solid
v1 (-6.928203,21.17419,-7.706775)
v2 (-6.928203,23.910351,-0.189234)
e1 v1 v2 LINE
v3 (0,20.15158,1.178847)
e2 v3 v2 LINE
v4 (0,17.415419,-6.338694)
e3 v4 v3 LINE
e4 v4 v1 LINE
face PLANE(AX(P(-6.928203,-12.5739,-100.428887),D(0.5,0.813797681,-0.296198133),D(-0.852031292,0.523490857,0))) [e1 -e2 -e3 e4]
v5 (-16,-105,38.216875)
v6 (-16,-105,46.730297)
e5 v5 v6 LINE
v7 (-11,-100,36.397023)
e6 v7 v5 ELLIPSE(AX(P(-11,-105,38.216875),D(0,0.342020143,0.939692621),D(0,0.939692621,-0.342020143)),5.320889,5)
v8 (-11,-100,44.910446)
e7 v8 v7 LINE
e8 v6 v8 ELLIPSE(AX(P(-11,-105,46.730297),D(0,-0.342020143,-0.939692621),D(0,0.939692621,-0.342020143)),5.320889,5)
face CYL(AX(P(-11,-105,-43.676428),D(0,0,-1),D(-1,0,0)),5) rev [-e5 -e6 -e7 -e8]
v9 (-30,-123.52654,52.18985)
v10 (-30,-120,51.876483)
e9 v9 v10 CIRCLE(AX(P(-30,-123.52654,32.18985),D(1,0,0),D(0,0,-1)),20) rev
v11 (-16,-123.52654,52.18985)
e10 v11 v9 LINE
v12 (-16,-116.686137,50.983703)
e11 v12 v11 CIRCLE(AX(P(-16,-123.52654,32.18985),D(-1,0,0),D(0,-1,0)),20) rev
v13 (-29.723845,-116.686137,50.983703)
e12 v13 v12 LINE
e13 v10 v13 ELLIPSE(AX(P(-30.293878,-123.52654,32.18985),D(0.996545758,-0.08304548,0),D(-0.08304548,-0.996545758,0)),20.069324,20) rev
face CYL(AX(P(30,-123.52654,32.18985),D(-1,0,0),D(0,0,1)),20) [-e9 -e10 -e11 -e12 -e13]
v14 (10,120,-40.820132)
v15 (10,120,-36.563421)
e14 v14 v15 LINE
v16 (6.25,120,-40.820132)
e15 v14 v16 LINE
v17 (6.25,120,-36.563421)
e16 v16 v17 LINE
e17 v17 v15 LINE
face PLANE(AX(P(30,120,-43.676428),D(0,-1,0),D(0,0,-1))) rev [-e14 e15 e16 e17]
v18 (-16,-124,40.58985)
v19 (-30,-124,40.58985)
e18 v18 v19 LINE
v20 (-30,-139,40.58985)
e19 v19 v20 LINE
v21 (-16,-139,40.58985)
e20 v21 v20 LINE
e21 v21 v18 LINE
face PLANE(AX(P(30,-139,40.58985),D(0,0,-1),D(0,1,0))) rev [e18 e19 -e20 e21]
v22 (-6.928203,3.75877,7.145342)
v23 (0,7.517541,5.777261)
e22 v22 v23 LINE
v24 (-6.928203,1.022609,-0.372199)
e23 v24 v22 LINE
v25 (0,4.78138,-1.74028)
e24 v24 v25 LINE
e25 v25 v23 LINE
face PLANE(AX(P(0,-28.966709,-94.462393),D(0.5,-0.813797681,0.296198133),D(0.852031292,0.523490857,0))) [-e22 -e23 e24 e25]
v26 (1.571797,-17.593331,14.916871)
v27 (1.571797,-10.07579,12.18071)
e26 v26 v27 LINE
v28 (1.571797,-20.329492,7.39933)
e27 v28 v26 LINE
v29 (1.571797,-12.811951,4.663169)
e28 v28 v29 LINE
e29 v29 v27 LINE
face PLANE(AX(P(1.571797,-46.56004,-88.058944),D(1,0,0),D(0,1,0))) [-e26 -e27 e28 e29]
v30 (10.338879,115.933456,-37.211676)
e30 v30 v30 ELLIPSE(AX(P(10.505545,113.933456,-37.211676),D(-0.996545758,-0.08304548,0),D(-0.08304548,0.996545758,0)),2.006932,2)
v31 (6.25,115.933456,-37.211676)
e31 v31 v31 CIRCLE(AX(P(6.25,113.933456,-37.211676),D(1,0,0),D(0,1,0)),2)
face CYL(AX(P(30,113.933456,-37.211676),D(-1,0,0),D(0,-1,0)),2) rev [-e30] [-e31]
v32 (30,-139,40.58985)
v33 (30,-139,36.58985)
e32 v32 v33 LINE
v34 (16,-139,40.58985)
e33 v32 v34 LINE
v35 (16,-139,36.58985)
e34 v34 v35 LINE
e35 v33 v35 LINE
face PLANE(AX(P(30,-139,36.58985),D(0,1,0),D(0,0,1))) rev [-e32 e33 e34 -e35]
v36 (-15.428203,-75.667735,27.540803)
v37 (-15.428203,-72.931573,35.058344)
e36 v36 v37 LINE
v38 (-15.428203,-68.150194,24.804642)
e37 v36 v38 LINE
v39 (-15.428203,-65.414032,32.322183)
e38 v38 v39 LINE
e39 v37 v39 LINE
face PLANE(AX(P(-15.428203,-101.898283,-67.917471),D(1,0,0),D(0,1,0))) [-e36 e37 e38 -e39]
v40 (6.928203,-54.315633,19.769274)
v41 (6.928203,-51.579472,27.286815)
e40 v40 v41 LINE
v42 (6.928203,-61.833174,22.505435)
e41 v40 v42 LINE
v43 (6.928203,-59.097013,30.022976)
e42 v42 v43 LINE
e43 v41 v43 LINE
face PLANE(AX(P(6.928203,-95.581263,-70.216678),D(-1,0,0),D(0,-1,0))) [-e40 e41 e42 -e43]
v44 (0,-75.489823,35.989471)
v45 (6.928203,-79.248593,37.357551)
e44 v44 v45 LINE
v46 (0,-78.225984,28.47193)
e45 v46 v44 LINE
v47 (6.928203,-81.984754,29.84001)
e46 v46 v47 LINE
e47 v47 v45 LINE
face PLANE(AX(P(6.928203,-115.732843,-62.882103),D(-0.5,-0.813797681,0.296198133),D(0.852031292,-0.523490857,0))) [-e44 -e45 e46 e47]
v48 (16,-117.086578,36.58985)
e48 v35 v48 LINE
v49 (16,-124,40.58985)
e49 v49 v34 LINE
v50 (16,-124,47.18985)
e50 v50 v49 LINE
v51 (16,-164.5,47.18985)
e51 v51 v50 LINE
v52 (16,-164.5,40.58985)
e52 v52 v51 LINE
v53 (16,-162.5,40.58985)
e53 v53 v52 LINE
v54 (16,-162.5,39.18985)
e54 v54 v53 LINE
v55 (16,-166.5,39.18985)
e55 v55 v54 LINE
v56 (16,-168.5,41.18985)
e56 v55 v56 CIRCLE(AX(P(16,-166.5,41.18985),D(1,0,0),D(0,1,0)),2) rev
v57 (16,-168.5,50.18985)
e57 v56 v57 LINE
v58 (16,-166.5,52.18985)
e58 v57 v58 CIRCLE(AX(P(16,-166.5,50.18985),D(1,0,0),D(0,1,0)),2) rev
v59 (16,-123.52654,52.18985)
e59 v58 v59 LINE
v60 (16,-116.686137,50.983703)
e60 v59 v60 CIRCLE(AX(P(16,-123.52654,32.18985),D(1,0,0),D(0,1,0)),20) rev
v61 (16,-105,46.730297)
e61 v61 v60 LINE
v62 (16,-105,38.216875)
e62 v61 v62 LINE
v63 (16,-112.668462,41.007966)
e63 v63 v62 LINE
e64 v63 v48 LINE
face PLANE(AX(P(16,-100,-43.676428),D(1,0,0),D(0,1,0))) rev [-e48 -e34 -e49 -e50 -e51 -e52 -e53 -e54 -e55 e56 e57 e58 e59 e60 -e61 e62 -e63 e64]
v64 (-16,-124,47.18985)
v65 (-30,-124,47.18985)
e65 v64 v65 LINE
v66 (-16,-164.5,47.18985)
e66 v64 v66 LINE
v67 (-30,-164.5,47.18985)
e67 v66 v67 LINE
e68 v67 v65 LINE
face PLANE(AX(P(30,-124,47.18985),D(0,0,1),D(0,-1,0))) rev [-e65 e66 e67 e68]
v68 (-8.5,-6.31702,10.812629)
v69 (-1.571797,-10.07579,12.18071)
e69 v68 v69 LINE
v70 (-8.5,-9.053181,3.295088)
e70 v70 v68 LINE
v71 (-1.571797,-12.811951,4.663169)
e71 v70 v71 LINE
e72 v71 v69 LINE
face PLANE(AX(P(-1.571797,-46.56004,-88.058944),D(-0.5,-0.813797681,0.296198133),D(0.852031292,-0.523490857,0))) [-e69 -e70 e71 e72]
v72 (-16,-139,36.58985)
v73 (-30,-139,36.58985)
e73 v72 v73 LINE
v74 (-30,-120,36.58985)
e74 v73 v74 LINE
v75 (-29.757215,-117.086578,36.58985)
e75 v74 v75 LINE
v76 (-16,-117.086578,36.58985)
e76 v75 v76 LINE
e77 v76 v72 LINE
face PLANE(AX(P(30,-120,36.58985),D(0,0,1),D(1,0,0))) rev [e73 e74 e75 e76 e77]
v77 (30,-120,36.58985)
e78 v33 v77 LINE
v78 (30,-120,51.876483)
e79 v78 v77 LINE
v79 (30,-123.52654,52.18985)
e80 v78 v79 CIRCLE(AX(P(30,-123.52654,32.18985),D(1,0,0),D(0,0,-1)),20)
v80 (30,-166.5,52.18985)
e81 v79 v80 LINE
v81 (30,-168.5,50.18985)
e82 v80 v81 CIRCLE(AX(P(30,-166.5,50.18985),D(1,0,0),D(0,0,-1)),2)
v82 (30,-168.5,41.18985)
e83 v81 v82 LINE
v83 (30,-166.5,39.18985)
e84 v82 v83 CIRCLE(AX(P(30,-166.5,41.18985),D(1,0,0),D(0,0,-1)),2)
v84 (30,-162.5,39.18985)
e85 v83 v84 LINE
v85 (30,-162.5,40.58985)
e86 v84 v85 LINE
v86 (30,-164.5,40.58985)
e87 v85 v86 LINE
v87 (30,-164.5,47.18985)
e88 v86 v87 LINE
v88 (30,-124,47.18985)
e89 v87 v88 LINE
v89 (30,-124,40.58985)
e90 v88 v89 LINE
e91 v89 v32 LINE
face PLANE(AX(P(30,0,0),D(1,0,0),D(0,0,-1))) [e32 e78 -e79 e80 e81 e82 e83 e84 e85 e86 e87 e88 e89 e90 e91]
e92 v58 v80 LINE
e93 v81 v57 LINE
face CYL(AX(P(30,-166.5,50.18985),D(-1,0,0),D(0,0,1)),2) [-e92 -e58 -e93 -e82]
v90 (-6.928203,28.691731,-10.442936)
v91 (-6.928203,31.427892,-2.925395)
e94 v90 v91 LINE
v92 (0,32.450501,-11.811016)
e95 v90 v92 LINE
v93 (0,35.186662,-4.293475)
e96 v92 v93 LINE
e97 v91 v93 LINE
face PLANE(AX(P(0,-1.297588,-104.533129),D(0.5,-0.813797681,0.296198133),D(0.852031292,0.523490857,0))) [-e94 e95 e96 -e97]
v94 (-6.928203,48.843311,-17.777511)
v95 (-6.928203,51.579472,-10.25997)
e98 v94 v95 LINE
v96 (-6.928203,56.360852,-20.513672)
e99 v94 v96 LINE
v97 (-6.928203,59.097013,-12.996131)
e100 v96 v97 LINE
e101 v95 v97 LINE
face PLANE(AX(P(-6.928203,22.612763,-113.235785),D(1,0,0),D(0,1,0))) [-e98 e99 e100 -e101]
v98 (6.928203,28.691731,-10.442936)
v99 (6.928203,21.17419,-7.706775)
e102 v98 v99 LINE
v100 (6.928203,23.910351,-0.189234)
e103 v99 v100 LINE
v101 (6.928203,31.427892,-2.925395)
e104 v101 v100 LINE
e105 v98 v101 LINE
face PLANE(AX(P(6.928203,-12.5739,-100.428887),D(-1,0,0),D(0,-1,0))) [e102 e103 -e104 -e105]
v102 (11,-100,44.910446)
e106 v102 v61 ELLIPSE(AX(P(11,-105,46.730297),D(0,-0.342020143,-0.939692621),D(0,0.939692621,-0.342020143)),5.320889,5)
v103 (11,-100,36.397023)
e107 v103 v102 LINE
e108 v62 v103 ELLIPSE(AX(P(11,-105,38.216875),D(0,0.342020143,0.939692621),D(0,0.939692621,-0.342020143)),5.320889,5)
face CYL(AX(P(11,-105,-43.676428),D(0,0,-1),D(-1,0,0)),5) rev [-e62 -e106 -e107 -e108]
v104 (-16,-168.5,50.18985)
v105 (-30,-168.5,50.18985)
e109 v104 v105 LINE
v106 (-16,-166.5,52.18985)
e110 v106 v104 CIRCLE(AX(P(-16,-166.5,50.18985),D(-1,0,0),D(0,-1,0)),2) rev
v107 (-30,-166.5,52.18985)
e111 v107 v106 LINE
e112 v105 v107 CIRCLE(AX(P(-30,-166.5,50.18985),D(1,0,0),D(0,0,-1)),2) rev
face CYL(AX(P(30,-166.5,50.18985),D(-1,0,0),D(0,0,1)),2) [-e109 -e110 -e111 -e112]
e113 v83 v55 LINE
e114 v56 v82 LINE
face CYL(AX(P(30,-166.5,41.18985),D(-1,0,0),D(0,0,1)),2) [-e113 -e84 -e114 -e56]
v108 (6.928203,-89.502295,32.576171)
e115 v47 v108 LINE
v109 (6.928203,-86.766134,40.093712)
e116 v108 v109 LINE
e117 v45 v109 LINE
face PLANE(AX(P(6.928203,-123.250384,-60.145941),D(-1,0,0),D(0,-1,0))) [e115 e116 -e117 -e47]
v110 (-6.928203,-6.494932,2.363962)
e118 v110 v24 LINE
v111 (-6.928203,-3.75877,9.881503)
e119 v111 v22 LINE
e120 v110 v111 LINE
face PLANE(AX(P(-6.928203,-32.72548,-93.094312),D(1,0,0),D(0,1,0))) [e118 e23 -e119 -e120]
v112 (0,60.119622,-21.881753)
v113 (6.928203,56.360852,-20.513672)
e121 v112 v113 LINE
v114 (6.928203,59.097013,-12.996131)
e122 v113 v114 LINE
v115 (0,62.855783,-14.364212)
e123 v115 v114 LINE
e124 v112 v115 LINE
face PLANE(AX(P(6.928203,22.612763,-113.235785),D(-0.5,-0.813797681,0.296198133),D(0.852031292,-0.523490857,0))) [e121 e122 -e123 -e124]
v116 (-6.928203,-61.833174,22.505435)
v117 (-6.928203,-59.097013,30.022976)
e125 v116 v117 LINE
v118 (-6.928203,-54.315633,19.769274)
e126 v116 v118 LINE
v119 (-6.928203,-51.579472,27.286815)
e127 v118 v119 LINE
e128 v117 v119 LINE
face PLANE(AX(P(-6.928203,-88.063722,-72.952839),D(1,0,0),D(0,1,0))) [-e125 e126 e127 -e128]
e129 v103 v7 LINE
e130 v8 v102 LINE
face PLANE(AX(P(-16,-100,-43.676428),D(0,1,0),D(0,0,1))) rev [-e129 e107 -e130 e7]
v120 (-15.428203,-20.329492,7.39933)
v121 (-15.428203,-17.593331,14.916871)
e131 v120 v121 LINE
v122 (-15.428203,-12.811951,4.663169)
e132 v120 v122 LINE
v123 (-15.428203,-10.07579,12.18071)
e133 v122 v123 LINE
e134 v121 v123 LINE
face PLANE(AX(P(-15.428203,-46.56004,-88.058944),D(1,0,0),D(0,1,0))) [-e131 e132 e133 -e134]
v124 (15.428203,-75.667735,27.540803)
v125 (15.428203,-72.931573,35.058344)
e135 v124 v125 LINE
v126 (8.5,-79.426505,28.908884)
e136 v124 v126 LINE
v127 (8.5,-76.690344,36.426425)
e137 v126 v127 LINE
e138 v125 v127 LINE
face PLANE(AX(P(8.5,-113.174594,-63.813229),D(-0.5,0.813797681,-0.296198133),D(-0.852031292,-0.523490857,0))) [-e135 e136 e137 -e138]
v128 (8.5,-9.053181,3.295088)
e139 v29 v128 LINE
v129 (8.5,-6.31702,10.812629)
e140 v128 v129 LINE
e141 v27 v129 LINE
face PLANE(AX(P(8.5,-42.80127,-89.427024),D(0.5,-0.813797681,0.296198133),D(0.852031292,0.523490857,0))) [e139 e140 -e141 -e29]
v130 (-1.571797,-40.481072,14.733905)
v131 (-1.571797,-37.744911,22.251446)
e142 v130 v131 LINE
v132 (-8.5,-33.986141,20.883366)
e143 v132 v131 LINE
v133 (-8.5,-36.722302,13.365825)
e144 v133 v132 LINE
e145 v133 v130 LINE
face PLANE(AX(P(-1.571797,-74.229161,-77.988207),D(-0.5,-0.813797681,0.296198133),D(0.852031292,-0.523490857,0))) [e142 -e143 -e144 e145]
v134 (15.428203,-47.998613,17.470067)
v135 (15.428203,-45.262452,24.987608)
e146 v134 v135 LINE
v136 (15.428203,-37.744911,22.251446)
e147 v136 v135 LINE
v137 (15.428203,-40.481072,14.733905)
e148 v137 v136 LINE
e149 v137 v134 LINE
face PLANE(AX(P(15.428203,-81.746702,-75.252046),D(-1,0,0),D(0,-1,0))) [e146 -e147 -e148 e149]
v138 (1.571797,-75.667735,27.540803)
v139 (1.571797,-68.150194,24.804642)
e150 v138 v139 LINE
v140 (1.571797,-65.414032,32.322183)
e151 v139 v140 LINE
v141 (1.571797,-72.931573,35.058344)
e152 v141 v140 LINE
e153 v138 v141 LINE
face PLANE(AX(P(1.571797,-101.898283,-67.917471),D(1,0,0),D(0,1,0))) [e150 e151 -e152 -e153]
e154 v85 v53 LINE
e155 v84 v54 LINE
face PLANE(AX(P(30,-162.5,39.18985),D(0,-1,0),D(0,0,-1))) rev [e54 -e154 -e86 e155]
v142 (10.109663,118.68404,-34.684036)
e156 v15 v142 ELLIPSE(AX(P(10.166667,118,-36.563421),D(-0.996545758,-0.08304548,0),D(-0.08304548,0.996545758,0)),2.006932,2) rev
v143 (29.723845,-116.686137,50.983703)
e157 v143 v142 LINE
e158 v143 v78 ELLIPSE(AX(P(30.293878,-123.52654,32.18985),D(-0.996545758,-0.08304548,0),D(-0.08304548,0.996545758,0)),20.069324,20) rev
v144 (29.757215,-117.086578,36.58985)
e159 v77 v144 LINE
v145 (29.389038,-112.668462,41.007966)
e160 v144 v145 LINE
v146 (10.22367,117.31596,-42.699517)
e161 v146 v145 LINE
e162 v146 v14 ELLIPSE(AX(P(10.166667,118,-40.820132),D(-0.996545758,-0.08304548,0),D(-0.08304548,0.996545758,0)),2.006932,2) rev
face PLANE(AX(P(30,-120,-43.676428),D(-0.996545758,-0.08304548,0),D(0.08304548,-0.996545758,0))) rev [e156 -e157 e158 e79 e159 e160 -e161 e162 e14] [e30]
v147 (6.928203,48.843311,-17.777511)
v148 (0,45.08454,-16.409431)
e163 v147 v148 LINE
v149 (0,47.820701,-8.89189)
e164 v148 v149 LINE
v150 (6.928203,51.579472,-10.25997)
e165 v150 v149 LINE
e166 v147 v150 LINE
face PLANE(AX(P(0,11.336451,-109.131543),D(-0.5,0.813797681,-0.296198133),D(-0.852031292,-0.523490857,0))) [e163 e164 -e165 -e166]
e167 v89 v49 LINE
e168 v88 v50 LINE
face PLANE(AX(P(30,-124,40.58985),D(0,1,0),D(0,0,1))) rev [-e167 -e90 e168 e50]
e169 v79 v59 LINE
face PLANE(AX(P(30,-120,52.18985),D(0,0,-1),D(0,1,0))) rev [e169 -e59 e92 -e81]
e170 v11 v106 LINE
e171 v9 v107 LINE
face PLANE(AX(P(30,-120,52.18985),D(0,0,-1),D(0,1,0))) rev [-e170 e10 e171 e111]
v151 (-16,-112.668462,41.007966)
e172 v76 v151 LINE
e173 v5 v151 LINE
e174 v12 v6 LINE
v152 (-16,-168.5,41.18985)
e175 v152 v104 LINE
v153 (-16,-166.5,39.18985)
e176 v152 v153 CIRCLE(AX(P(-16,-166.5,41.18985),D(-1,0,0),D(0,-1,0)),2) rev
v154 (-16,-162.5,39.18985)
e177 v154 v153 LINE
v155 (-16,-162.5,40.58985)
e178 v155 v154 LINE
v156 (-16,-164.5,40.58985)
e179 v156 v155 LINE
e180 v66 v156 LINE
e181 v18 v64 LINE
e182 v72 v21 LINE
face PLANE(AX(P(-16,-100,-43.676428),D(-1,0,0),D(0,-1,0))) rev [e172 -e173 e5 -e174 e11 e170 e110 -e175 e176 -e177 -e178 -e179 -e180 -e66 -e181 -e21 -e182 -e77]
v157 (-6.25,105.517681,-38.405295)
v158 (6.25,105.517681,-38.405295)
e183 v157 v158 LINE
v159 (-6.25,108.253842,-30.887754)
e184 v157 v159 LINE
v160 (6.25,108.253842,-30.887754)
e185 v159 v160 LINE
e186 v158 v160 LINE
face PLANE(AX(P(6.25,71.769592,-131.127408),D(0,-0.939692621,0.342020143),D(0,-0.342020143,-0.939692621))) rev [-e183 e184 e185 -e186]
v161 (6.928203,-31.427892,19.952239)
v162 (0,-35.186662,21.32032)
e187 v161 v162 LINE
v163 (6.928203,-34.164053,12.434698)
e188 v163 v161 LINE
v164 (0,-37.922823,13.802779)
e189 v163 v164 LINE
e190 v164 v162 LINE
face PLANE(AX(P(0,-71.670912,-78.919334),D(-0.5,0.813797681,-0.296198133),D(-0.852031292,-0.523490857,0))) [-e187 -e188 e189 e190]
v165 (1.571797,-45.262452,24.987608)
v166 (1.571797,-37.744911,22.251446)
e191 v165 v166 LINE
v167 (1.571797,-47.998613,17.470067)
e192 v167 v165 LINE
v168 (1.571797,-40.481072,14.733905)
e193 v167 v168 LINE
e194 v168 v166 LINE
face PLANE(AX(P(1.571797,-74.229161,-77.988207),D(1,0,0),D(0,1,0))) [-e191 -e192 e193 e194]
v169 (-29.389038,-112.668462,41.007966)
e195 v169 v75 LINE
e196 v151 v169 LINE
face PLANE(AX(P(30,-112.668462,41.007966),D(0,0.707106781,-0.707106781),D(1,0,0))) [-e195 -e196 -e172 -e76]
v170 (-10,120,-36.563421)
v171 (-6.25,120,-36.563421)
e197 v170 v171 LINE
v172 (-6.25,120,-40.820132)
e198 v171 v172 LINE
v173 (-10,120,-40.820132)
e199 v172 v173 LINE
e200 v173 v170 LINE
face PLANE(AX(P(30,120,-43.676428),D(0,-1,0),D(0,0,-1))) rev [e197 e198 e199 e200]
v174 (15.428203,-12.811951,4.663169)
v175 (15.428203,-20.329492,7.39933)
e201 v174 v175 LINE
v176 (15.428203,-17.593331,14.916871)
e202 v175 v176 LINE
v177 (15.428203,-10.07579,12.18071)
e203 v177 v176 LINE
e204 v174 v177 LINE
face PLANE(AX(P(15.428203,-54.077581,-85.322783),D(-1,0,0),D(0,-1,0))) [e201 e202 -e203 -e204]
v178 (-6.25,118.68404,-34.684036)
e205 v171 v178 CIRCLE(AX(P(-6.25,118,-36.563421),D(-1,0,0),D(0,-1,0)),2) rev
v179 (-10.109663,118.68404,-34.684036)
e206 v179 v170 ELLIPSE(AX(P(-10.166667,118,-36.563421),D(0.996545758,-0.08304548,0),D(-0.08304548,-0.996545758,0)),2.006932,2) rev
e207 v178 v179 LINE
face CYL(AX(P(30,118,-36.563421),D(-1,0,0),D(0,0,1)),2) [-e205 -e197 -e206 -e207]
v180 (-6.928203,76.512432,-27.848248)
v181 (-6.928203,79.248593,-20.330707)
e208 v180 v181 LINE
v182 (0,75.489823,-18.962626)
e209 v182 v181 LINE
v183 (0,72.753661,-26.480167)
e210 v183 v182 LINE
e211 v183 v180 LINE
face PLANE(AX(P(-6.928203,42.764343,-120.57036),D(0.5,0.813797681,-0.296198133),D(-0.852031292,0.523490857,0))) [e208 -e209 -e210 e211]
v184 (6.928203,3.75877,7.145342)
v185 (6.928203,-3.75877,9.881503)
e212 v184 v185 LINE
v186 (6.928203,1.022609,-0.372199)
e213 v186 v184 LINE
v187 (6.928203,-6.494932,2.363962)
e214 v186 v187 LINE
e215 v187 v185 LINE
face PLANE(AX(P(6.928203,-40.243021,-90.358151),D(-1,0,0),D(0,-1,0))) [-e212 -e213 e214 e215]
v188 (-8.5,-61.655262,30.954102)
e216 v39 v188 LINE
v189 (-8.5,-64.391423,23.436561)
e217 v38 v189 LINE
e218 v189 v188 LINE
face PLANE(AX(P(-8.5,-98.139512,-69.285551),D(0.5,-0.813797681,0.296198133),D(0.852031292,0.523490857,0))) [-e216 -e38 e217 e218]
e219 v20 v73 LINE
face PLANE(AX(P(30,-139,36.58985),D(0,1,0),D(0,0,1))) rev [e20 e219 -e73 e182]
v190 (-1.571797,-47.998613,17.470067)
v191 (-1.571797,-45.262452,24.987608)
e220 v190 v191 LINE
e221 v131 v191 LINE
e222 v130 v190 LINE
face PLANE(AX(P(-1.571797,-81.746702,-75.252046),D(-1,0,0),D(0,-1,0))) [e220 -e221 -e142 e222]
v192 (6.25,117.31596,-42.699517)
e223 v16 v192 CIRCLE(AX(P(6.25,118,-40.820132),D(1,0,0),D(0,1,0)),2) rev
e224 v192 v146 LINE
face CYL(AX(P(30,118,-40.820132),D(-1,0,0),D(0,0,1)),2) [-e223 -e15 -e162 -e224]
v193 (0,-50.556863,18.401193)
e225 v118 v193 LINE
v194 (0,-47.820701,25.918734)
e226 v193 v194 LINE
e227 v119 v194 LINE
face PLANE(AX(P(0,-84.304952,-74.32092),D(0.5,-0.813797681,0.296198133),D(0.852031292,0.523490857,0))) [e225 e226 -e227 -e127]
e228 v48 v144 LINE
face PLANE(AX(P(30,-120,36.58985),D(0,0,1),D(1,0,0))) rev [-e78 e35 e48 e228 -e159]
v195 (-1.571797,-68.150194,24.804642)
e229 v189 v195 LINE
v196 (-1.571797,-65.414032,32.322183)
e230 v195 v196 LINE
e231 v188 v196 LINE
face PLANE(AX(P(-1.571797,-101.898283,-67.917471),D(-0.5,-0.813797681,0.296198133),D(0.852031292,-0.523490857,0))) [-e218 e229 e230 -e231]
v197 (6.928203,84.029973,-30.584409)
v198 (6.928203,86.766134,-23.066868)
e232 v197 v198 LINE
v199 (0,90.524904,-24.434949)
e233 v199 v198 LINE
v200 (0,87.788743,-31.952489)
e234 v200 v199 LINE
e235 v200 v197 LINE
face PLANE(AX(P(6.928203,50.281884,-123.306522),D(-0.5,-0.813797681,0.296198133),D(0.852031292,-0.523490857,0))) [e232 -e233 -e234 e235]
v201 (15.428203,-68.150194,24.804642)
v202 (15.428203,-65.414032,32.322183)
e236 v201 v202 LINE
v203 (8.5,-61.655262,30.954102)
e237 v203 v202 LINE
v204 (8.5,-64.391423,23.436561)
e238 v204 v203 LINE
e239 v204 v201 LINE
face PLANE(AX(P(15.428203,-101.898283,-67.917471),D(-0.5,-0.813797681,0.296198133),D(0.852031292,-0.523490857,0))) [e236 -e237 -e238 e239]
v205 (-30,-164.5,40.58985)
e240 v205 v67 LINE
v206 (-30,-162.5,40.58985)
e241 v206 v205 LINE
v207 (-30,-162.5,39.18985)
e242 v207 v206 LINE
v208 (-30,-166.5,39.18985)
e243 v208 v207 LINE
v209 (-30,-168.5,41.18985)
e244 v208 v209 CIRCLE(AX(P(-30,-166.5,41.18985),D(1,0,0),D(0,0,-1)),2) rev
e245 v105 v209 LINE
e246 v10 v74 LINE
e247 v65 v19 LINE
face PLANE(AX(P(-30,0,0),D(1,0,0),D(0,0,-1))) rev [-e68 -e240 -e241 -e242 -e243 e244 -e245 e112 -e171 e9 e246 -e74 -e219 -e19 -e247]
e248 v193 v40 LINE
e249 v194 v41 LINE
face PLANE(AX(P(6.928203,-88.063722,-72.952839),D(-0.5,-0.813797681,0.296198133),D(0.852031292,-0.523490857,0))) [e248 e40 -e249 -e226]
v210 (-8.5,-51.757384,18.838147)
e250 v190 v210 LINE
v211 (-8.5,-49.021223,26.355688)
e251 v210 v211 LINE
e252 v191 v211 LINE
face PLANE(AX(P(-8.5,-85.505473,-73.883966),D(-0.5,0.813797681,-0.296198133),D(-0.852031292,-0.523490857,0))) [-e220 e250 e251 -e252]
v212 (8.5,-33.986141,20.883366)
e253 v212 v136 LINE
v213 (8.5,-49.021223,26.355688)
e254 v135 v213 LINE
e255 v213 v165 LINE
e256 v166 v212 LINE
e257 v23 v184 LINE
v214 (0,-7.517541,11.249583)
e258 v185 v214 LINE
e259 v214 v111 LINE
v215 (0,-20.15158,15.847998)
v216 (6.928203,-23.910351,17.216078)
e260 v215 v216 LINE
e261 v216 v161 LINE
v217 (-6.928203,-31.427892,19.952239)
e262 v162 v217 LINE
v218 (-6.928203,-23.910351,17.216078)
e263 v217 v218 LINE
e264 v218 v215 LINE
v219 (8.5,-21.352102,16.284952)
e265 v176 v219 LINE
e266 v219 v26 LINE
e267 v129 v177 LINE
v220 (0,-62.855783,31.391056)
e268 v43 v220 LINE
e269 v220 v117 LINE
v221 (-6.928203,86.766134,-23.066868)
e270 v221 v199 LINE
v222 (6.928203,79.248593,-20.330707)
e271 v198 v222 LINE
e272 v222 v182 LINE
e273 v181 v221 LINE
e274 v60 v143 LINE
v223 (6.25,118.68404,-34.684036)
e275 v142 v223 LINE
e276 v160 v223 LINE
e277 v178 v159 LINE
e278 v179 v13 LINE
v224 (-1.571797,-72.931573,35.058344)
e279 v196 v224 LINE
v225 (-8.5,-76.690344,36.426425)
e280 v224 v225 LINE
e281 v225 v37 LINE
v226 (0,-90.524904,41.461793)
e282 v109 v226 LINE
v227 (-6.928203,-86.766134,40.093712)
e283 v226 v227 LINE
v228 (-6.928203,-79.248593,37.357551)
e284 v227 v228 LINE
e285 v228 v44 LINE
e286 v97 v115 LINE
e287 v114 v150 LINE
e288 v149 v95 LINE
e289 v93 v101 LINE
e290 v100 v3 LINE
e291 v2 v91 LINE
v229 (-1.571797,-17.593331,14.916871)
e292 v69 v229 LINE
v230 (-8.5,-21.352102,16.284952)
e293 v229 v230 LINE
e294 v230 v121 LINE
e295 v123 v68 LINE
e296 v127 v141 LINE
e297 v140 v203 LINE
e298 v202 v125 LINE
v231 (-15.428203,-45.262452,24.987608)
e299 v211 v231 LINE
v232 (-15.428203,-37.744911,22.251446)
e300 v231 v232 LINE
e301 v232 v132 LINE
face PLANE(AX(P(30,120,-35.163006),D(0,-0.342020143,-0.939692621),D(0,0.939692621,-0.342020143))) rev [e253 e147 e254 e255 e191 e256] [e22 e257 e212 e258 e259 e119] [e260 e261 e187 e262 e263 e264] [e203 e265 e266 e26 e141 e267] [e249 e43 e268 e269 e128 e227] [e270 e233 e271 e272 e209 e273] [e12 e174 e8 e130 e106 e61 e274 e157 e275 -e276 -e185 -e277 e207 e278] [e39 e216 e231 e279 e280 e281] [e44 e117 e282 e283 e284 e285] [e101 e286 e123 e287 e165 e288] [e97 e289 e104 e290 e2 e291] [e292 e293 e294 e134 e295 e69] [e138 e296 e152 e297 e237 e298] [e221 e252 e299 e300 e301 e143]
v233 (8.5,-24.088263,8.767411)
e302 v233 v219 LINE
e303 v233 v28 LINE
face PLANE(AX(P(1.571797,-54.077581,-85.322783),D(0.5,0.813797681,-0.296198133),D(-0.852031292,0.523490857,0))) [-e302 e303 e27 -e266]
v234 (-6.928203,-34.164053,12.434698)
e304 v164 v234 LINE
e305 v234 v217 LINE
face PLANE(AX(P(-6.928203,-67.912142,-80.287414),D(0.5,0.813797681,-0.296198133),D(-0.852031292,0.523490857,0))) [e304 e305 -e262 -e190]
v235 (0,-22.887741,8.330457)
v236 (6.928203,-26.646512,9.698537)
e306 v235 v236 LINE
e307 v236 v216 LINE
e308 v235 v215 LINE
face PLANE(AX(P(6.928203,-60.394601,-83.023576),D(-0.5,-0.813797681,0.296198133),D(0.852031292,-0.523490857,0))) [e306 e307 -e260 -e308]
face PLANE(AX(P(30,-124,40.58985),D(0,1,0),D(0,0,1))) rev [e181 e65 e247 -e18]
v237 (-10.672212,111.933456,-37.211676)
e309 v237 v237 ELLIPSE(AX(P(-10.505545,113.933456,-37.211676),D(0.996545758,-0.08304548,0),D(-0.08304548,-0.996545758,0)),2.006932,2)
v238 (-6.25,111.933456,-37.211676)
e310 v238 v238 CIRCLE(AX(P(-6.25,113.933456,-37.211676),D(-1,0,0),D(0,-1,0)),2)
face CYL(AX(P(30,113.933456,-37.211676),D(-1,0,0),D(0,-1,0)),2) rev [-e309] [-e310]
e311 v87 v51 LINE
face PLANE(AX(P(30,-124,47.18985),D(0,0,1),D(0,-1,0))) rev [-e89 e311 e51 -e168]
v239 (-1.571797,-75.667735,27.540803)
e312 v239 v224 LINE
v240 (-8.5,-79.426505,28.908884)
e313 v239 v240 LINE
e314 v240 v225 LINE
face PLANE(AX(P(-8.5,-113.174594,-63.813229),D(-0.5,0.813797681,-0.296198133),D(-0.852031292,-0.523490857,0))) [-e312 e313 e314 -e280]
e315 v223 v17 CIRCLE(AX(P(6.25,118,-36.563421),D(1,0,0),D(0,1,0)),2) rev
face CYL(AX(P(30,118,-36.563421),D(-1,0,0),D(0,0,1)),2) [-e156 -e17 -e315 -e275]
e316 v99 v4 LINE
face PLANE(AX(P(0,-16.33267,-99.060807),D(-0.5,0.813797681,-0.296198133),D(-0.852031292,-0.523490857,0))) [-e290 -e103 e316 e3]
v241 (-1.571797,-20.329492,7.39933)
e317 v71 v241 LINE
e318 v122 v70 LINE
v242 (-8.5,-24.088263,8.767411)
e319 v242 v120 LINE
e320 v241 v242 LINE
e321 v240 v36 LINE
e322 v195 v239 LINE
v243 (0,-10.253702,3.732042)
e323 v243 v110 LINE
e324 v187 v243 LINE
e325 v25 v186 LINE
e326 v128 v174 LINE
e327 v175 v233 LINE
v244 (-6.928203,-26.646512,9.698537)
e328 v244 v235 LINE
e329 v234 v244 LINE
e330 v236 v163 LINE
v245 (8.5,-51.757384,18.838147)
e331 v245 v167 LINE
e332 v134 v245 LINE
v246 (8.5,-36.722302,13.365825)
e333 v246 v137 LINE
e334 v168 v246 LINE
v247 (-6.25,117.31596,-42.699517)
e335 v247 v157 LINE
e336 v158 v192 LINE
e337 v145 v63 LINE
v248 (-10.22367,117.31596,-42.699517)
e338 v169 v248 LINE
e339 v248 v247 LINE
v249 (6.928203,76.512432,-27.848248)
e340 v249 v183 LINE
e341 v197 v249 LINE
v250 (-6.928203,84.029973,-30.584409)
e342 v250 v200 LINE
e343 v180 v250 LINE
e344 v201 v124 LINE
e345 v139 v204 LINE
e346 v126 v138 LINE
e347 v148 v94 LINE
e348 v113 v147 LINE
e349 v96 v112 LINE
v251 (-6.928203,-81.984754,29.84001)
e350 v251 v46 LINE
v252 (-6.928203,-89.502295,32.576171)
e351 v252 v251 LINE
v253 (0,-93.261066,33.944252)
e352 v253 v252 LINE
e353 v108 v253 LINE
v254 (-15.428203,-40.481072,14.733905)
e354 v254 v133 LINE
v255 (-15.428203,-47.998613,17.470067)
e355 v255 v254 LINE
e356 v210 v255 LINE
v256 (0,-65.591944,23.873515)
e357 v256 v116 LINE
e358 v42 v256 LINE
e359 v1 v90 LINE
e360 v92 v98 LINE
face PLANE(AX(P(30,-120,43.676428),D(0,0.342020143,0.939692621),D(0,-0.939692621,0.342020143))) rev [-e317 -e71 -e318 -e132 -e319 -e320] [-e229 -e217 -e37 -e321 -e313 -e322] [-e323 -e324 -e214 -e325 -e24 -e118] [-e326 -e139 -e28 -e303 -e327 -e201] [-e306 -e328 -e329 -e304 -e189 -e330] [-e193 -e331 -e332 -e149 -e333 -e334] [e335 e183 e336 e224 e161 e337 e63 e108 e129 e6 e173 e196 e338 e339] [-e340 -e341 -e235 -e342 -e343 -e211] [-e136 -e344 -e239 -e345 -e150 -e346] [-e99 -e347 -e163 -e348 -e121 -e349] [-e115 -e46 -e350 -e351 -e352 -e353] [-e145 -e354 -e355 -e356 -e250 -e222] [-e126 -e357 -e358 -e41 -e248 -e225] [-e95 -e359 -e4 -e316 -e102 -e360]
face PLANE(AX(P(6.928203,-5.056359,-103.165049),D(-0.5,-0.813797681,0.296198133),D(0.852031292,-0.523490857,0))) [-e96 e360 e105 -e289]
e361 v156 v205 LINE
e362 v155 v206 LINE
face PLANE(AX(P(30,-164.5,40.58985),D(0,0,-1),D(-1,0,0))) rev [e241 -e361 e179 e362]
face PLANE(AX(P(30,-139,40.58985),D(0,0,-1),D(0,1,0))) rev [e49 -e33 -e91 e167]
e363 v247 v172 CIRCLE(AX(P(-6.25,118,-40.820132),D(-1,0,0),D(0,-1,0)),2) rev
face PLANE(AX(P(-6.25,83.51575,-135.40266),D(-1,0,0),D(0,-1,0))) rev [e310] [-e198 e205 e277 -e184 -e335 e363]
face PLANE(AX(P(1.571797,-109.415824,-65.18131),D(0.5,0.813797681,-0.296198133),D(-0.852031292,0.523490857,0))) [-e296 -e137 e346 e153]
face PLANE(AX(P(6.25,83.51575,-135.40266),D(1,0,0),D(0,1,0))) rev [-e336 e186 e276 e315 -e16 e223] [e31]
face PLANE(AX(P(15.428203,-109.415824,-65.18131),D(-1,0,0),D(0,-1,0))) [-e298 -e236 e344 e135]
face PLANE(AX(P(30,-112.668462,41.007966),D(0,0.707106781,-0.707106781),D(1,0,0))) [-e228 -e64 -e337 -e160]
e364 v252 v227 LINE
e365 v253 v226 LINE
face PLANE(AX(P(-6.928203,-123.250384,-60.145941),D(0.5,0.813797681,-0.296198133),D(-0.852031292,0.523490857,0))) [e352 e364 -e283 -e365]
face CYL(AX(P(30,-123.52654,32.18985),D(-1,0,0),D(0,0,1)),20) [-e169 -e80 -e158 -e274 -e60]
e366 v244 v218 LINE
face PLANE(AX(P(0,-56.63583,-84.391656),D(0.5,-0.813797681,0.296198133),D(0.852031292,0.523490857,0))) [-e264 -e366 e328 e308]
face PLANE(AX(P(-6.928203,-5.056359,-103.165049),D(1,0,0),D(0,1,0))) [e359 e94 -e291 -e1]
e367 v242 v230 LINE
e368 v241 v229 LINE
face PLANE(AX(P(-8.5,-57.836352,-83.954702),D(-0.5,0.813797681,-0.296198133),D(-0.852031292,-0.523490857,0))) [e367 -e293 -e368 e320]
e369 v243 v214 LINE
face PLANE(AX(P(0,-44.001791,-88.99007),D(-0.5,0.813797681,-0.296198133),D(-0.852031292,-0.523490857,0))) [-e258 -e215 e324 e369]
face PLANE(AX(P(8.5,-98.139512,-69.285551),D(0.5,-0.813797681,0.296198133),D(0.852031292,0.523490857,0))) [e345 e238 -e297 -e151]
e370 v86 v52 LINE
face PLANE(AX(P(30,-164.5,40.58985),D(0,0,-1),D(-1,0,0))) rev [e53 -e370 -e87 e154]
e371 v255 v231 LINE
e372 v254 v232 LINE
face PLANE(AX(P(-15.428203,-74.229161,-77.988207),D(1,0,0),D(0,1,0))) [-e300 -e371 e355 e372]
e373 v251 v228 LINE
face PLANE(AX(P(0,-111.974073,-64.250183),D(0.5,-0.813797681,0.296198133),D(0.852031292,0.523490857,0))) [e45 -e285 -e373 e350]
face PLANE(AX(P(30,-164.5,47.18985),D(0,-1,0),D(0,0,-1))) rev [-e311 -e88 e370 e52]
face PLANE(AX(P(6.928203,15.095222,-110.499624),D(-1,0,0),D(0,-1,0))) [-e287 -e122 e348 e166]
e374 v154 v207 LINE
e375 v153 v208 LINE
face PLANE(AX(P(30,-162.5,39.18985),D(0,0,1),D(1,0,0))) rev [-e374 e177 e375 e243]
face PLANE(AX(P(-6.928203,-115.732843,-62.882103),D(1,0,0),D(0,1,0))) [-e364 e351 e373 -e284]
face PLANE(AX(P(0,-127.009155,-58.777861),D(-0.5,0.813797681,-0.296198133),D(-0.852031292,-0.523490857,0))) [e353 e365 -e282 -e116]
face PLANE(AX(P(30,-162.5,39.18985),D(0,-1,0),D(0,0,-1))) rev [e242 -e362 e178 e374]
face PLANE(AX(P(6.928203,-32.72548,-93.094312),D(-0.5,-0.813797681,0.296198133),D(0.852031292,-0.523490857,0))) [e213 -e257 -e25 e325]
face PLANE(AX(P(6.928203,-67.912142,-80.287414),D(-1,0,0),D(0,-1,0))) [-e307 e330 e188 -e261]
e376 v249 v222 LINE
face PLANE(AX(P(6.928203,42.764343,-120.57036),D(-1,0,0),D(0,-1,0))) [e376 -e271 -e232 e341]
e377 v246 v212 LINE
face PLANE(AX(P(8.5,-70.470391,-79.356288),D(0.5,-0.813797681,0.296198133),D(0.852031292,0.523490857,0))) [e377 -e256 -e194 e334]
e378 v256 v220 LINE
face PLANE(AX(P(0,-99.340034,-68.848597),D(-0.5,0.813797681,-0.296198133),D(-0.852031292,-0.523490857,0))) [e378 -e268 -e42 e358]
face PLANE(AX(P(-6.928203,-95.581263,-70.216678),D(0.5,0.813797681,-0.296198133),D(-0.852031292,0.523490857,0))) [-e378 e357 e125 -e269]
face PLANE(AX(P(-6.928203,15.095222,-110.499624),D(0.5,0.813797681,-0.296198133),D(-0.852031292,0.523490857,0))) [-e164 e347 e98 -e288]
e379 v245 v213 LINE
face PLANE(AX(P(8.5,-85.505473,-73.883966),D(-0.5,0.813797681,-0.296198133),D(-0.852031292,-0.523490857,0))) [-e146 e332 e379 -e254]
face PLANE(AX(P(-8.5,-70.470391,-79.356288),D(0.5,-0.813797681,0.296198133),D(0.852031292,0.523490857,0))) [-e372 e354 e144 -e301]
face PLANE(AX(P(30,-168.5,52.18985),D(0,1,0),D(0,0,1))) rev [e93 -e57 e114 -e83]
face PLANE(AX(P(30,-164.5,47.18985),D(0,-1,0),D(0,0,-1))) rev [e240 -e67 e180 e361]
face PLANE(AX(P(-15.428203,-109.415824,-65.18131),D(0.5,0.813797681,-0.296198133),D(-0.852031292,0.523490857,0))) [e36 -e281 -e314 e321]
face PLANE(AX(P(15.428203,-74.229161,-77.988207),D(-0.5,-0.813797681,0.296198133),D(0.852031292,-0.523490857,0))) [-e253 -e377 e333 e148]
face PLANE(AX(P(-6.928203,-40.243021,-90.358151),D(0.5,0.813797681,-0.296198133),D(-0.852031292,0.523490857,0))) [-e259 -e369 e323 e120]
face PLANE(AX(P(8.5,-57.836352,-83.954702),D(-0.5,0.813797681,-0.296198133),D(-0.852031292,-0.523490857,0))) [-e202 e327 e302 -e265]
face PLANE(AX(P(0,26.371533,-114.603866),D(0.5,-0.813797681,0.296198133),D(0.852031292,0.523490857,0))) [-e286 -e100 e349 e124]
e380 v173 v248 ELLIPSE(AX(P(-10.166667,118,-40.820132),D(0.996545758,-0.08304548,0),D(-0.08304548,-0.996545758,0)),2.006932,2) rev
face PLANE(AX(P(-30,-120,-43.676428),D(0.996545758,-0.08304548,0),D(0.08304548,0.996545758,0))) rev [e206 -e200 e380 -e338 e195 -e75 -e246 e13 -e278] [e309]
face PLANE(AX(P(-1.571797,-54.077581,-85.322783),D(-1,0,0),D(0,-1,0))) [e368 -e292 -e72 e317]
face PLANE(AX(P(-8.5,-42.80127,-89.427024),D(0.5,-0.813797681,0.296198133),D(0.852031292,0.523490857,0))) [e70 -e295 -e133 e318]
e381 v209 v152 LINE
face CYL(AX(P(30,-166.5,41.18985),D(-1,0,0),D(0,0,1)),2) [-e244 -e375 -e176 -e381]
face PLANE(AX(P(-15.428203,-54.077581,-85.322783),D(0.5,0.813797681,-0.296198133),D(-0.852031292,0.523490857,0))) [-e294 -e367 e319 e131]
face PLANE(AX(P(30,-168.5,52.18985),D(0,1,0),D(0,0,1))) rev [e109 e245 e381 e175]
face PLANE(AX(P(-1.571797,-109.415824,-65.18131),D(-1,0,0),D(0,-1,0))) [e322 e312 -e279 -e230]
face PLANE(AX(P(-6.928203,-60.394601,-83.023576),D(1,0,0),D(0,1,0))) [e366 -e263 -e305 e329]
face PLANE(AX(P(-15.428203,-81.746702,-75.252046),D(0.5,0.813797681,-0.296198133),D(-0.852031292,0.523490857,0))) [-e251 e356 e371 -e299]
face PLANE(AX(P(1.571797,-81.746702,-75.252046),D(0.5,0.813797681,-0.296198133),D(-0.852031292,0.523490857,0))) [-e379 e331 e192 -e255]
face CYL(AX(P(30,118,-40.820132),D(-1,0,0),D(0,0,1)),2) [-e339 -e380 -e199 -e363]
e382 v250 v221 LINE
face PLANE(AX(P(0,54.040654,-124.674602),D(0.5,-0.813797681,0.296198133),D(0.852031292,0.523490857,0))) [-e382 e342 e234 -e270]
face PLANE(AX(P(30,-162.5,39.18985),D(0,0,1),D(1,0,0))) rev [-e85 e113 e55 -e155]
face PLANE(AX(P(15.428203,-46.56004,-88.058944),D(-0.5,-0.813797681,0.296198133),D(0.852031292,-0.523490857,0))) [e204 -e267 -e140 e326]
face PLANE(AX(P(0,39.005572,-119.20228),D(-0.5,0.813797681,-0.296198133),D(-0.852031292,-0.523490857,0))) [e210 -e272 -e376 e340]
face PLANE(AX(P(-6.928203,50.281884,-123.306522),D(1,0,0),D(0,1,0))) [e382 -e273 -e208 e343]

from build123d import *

# Parameters (mm, degrees)
BOSS_EXTRUDE1_DEPTH     = 30
CUT_EXTRUDE1_DEPTH      = 197.169807399
SKETCH4_W               = 32
SKETCH4_H               = 68.5
CUT_EXTRUDE2_DEPTH      = 197.169807399
CHAMFER1_SIZE           = 7.802060087
CHAMFER1_SIZE_2         = 10
CUT_EXTRUDE3_DEPTH      = 163.649773439
CUT_EXTRUDE4_DEPTH      = 181.083572192
CUT_EXTRUDE4_DEPTH_BACK = 181.083572192
SKETCH6_R               = 2
FILL_PATTERN1_DEPTH     = 8
FILLET5_R               = 20
FILLET2_R               = 5
FILLET4_R               = 2
FILLET6_R               = 2


# Read off the part's stored shape, not the designer's step: Fill Pattern1
with BuildPart() as part:
    # Sketch2 → Boss-Extrude1 (new, symmetric)
    with BuildSketch(Plane(origin=(0, 0, 0), x_dir=(0, 0, -1), z_dir=(1, 0, 0))):
        Polygon((35.163005932, 120), (-52.189850292, -120), (-52.189850292, -168.5), (-39.189850292, -168.5), (-39.189850292, -162.5), (-40.589850292, -162.5), (-40.589850292, -164.5), (-47.189850292, -164.5), (-47.189850292, -124), (-40.589850292, -124), (-40.589850292, -139), (-36.589850292, -139), (-36.589850292, -120), (-43.676428112, -120), (43.676428112, 120), align=None)
    extrude(amount=BOSS_EXTRUDE1_DEPTH, both=True)

    # Sketch3 → Cut-Extrude1 (cut, through all)
    with BuildSketch(Plane.XY.offset(52.189850292)):
        Polygon((-30, 120), (-30, -120), (-10, 120), align=None)
        Polygon((10, 120), (30, 120), (30, -120), align=None)
    extrude(amount=-CUT_EXTRUDE1_DEPTH, mode=Mode.SUBTRACT)

    # Sketch4 → Cut-Extrude2 (cut, through all)
    with BuildSketch(Plane.XY.offset(52.189850292)):
        with Locations((0, -134.25)):
            Rectangle(SKETCH4_W, SKETCH4_H)
    extrude(amount=-CUT_EXTRUDE2_DEPTH, mode=Mode.SUBTRACT)

    # Chamfer1
    # the kernel refuses this chamfer: 10, 7.802060087 mm, written as the material it adds along each edge
    with BuildSketch(Plane(origin=(-16, -120, 43.676428112), x_dir=(0, 0.9542611885293295, -0.29897421973573485), z_dir=(-1, 0, 0))) as chamfer1_piece_1_section:
        Polygon((CHAMFER1_SIZE * 0.998967402661, CHAMFER1_SIZE * 0.0454326803806), (CHAMFER1_SIZE_2 * 0.298974219736, CHAMFER1_SIZE_2 * 0.954261188529), (0, 0), align=None)
    chamfer1_piece_1 = extrude(amount=14, mode=Mode.PRIVATE)
    chamfer1_piece_1 = split(chamfer1_piece_1, bisect_by=Plane(origin=(-29.733836006, -116.806032072, 40.079574986), z_dir=(0.9965457582448797, -0.08304547985373997, 0)), keep=Keep.TOP, mode=Mode.PRIVATE)
    chamfer1_piece_1 = split(chamfer1_piece_1, bisect_by=Plane(origin=(-22.890520375, -117.376308375, 36.589850292), z_dir=(0, 0, 1)), keep=Keep.TOP, mode=Mode.PRIVATE)
    add(chamfer1_piece_1)
    with BuildSketch(Plane(origin=(30, -120, 43.676428112), x_dir=(0, 0.9542611885293295, -0.29897421973573485), z_dir=(-1, 0, 0))) as chamfer1_piece_2_section:
        Polygon((CHAMFER1_SIZE * 0.998967402661, CHAMFER1_SIZE * 0.0454326803806), (CHAMFER1_SIZE_2 * 0.298974219736, CHAMFER1_SIZE_2 * 0.954261188529), (0, 0), align=None)
    chamfer1_piece_2 = extrude(amount=14, mode=Mode.PRIVATE)
    chamfer1_piece_2 = split(chamfer1_piece_2, bisect_by=Plane(origin=(29.733836006, -116.806032072, 40.079574986), z_dir=(-0.9965457582448797, -0.08304547985373997, 0)), keep=Keep.TOP, mode=Mode.PRIVATE)
    chamfer1_piece_2 = split(chamfer1_piece_2, bisect_by=Plane(origin=(22.890520375, -117.376308375, 36.589850292), z_dir=(0, 0, 1)), keep=Keep.TOP, mode=Mode.PRIVATE)
    add(chamfer1_piece_2)

    # Sketch5 → Cut-Extrude3 (cut, through all)
    with BuildSketch(Plane(origin=(0, -20.133671251, 15.841479222), x_dir=(1, 0, 0), z_dir=(0, 0.3420201433256661, 0.9396926207859094))):
        Polygon((6.25, 149.12713812), (6.25, 136.62713812), (-6.25, 136.62713812), (-6.25, 149.12713812), (-6.25, 152.038899995), (6.25, 152.038899995), align=None)
    extrude(amount=-CUT_EXTRUDE3_DEPTH, mode=Mode.SUBTRACT)

    # Sketch6 → Cut-Extrude4 (cut, two sides: drawn at the far end of the back side and taken through both)
    with BuildSketch(Plane.ZY.offset(-6.25).offset(-CUT_EXTRUDE4_DEPTH_BACK)):
        with Locations(Location((-37.211675699, 113.933456323, 0), (0, 0, 270))):
            Circle(SKETCH6_R)
    extrude(amount=CUT_EXTRUDE4_DEPTH + CUT_EXTRUDE4_DEPTH_BACK, mode=Mode.SUBTRACT)

    # Fill Pattern1 outline → Fill Pattern1 (cut)
    with BuildSketch(Plane(origin=(0, 0, 0), x_dir=(1, 0, 0), z_dir=(0, 0.34202014332566616, 0.9396926207859093))):
        Polygon((8.5, -84.523921196), (15.42820323, -80.523921196), (15.42820323, -72.523921196), (8.5, -68.523921196), (1.57179677, -72.523921196), (1.57179677, -80.523921196), align=None)
        Polygon((15.42820323, -51.079057467), (15.42820323, -43.079057467), (8.5, -39.079057467), (1.57179677, -43.079057467), (1.57179677, -51.079057467), (8.5, -55.079057467), align=None)
        Polygon((15.42820323, -21.634193738), (15.42820323, -13.634193738), (8.5, -9.634193738), (1.57179677, -13.634193738), (1.57179677, -21.634193738), (8.5, -25.634193738), align=None)
        Polygon((-8.5, -25.634193738), (-1.57179677, -21.634193738), (-1.57179677, -13.634193738), (-8.5, -9.634193738), (-15.42820323, -13.634193738), (-15.42820323, -21.634193738), align=None)
        Polygon((-1.57179677, -51.079057467), (-1.57179677, -43.079057467), (-8.5, -39.079057467), (-15.42820323, -43.079057467), (-15.42820323, -51.079057467), (-8.5, -55.079057467), align=None)
        Polygon((-1.57179677, -80.523921196), (-1.57179677, -72.523921196), (-8.5, -68.523921196), (-15.42820323, -72.523921196), (-15.42820323, -80.523921196), (-8.5, -84.523921196), align=None)
        Polygon((0, -40.356625603), (6.92820323, -36.356625603), (6.92820323, -28.356625603), (0, -24.356625603), (-6.92820323, -28.356625603), (-6.92820323, -36.356625603), align=None)
        Polygon((6.92820323, -6.911761874), (6.92820323, 1.088238126), (0, 5.088238126), (-6.92820323, 1.088238126), (-6.92820323, -6.911761874), (0, -10.911761874), align=None)
        Polygon((6.92820323, 22.533101855), (6.92820323, 30.533101855), (0, 34.533101855), (-6.92820323, 30.533101855), (-6.92820323, 22.533101855), (0, 18.533101855), align=None)
        Polygon((6.92820323, 81.422829312), (6.92820323, 89.422829312), (0, 93.422829312), (-6.92820323, 89.422829312), (-6.92820323, 81.422829312), (0, 77.422829312), align=None)
        Polygon((6.92820323, 51.977965583), (6.92820323, 59.977965583), (0, 63.977965583), (-6.92820323, 59.977965583), (-6.92820323, 51.977965583), (0, 47.977965583), align=None)
        Polygon((6.92820323, -65.801489331), (6.92820323, -57.801489331), (0, -53.801489331), (-6.92820323, -57.801489331), (-6.92820323, -65.801489331), (0, -69.801489331), align=None)
        Polygon((6.92820323, -95.24635306), (6.92820323, -87.24635306), (0, -83.24635306), (-6.92820323, -87.24635306), (-6.92820323, -95.24635306), (0, -99.24635306), align=None)
    extrude(amount=FILL_PATTERN1_DEPTH, mode=Mode.SUBTRACT)

    # Fillet5
    fillet5_edges = [part.edges().sort_by_distance(p)[0] for p in [
        (23, -120, 52.189850292),
        (-23, -120, 52.189850292),
    ]]
    fillet(fillet5_edges, radius=FILLET5_R)

    # Fillet2
    fillet2_edges = [part.edges().sort_by_distance(p)[0] for p in [
        (-16, -100, 40.653734517),
        (16, -100, 40.653734517),
    ]]
    fillet(fillet2_edges, radius=FILLET2_R)

    # Fillet4
    fillet4_edges = [part.edges().sort_by_distance(p)[0] for p in [
        (-8.125, 120, -43.676428112),
        (-8.125, 120, -35.163005932),
        (8.125, 120, -43.676428112),
        (8.125, 120, -35.163005932),
    ]]
    fillet(fillet4_edges, radius=FILLET4_R)

    # Fillet6
    fillet6_edges = [part.edges().sort_by_distance(p)[0] for p in [
        (23, -168.5, 39.189850292),
        (23, -168.5, 52.189850292),
        (-23, -168.5, 39.189850292),
        (-23, -168.5, 52.189850292),
    ]]
    fillet(fillet6_edges, radius=FILLET6_R)


solid = part.part
